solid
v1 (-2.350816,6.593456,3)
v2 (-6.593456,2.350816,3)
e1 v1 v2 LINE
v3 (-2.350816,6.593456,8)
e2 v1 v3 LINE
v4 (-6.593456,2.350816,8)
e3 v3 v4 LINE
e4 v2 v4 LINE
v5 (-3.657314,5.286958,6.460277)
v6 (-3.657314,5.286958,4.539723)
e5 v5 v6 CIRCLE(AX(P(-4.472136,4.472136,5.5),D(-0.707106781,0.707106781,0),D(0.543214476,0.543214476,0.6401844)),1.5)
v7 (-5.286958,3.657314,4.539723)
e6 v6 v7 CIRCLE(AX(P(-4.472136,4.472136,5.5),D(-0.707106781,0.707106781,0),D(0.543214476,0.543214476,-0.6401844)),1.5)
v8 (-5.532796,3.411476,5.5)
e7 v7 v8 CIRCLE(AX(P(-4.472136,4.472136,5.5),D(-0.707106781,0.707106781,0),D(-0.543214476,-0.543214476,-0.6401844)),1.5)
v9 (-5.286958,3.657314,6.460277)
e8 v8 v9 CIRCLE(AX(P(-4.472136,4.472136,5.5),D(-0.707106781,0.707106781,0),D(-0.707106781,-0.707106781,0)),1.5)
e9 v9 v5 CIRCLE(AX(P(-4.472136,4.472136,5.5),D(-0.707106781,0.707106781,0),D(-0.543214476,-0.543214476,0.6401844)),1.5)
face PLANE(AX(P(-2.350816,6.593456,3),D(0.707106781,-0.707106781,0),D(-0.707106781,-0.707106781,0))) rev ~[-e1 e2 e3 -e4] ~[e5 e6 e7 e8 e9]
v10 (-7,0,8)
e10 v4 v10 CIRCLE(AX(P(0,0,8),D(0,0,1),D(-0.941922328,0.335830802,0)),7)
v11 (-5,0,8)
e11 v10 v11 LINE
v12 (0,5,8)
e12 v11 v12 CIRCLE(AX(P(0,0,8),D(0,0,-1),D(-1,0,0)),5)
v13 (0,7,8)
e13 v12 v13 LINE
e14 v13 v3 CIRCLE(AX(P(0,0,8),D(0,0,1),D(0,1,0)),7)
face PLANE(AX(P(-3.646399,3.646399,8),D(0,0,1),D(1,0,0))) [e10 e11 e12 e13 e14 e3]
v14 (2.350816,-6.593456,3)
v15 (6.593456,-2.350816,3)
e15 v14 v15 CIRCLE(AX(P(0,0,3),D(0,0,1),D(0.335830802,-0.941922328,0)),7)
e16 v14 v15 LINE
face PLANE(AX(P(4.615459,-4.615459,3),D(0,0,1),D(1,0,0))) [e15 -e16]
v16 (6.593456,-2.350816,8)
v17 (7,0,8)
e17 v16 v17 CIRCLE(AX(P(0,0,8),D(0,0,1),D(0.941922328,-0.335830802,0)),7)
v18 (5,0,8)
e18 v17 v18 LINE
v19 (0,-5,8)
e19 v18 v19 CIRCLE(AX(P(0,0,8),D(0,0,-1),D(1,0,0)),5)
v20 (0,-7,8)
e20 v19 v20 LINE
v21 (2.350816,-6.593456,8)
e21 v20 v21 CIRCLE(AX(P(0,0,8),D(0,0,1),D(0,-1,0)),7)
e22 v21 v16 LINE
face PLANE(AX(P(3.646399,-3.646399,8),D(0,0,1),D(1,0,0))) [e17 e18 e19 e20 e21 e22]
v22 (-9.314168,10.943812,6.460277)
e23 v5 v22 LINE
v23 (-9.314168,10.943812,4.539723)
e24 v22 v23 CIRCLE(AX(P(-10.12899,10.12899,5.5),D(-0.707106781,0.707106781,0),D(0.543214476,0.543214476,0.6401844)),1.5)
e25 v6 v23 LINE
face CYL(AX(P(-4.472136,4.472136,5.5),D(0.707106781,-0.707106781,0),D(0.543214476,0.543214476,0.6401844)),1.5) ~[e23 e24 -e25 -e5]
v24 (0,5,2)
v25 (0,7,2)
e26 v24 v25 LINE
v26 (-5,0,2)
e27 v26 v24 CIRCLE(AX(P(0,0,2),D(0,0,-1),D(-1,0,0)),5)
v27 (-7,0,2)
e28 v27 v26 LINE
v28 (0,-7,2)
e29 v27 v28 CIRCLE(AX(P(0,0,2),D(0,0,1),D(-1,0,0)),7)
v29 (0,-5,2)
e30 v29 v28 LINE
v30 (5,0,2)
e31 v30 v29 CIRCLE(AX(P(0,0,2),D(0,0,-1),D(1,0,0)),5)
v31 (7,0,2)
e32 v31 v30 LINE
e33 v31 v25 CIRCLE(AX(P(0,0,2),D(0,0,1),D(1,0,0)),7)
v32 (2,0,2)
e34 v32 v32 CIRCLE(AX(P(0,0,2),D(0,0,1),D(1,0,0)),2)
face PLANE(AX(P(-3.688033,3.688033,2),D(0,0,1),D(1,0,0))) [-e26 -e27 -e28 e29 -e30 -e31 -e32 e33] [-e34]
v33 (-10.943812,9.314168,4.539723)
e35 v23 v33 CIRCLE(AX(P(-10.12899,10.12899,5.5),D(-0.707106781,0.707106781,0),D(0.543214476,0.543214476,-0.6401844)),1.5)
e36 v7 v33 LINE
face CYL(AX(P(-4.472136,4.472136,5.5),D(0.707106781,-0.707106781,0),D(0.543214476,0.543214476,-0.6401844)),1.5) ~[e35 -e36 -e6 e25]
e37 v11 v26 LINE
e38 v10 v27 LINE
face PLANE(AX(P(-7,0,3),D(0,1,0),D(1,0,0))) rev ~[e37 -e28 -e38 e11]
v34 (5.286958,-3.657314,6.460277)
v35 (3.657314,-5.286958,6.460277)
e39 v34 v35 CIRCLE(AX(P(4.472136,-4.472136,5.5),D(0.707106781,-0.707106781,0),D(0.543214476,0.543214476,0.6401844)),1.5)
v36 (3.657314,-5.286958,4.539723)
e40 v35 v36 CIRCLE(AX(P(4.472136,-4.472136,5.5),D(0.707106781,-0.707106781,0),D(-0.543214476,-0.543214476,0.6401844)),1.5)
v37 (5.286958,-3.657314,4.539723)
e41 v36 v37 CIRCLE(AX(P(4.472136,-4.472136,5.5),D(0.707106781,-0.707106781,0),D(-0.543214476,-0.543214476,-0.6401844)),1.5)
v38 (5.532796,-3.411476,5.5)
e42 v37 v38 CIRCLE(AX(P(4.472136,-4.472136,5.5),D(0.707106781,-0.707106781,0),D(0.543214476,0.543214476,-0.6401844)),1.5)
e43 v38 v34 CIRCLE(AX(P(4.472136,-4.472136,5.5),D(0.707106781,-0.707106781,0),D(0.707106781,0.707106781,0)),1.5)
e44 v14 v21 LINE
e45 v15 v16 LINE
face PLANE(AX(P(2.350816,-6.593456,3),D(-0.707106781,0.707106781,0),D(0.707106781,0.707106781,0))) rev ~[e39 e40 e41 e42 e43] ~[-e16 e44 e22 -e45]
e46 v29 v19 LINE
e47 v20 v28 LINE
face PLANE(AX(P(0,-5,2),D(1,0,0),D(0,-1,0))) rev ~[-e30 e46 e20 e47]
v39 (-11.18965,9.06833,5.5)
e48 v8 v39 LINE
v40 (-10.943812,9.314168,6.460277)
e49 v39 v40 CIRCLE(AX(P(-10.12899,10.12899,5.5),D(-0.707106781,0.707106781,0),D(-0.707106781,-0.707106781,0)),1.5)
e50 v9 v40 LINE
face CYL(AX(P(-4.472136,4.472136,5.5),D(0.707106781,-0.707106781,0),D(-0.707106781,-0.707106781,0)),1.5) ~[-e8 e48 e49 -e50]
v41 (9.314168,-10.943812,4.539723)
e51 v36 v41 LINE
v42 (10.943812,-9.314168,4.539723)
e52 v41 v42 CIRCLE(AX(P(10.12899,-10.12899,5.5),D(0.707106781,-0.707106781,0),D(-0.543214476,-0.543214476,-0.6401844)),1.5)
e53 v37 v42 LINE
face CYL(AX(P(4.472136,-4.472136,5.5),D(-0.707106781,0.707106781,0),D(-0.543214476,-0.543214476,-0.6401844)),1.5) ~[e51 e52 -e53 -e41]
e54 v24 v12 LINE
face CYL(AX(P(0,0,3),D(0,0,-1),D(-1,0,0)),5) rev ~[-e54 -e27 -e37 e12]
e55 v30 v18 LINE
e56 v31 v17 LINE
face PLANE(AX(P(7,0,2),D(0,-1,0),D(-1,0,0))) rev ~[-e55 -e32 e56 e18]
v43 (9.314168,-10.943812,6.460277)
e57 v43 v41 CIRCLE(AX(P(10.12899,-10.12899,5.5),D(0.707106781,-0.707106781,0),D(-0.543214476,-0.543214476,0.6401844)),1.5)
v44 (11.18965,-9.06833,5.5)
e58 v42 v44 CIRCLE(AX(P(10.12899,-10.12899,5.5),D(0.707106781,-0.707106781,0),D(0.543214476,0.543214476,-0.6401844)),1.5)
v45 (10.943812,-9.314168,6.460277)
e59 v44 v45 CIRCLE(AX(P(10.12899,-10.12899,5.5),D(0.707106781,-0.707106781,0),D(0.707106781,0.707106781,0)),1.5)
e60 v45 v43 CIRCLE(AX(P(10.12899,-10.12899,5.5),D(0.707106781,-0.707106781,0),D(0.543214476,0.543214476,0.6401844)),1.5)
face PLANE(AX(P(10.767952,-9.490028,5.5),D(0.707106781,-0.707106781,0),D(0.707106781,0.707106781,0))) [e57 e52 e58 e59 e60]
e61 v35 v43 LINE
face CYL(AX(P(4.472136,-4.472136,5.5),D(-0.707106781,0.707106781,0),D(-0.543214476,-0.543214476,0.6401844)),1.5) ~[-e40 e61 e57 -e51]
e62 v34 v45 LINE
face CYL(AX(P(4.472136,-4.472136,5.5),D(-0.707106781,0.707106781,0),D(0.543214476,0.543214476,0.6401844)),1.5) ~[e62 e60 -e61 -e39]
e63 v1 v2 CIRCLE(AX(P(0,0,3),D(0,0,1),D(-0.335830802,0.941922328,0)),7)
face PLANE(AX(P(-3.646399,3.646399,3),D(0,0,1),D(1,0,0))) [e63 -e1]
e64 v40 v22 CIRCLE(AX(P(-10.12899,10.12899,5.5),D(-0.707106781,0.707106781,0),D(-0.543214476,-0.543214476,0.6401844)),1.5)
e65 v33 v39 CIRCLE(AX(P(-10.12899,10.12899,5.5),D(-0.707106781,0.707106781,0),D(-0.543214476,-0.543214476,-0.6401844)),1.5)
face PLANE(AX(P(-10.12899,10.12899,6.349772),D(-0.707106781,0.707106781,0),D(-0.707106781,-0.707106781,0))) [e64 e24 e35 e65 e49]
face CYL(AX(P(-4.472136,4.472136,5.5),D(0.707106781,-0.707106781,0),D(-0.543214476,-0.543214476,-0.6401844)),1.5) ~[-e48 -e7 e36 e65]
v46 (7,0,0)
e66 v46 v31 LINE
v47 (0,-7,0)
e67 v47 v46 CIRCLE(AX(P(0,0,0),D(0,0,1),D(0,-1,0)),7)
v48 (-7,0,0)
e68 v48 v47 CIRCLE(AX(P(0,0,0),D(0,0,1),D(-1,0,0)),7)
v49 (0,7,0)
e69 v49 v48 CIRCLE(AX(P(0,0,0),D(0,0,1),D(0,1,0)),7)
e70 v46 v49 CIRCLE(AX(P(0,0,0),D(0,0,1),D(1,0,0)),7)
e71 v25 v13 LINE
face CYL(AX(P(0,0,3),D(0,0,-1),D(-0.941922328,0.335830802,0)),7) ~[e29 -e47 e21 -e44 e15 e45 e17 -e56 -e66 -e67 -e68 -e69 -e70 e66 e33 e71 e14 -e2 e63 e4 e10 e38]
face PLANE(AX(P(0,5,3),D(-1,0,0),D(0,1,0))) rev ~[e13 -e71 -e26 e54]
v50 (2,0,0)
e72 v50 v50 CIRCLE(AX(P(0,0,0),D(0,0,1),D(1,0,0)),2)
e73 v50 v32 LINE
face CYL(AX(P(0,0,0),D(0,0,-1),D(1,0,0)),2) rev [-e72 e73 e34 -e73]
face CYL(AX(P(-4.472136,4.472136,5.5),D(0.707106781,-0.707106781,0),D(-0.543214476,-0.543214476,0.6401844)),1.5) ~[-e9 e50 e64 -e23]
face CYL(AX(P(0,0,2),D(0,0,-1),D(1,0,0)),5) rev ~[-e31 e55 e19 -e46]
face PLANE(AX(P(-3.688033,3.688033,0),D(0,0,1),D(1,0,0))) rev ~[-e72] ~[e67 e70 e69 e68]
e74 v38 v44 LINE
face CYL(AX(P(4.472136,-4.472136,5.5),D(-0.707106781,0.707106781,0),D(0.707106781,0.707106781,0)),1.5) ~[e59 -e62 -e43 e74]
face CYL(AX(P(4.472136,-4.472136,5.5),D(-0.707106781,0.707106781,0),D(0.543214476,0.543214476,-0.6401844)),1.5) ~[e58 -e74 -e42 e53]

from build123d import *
from build123d import SkipClean  # not in build123d's __all__

# Parameters (mm, degrees)
F0_R     = 2
F1_DEPTH = 2
F3_DEPTH = 1
F5_DEPTH = 5
F8_DEPTH = 8
F9_DEPTH = 8


with BuildPart() as f1:
    # F0 (on Top) → F1 (new body)
    with BuildSketch(Plane.XY):
        with BuildLine():
            ThreePointArc((-5, 0), (-3.5355339059, 3.5355339059), (0, 5))
            Line((0, 5), (0, 7))
            ThreePointArc((0, 7), (-4.9497474683, 4.9497474683), (-7, 0))
            Line((-7, 0), (-5, 0))
        make_face()
        with BuildLine():
            ThreePointArc((0, 5), (3.5355339059, 3.5355339059), (5, 0))
            Line((5, 0), (7, 0))
            ThreePointArc((7, 0), (4.9497474683, 4.9497474683), (0, 7))
            Line((0, 7), (0, 5))
        make_face()
        with BuildLine():
            Line((7, 0), (5, 0))
            ThreePointArc((5, 0), (3.5355339059, -3.5355339059), (0, -5))
            Line((0, -5), (0, -7))
            ThreePointArc((0, -7), (4.9497474683, -4.9497474683), (7, 0))
        make_face()
        with BuildLine():
            Line((0, -7), (0, -5))
            ThreePointArc((0, -5), (-3.5355339059, -3.5355339059), (-5, 0))
            Line((-5, 0), (-7, 0))
            ThreePointArc((-7, 0), (-4.9497474683, -4.9497474683), (0, -7))
        make_face()
        with BuildLine():
            ThreePointArc((0, -5), (3.5355339059, -3.5355339059), (5, 0))
            ThreePointArc((5, 0), (3.5355339059, 3.5355339059), (0, 5))
            ThreePointArc((0, 5), (-3.5355339059, 3.5355339059), (-5, 0))
            ThreePointArc((-5, 0), (-3.5355339059, -3.5355339059), (0, -5))
        make_face()
        Circle(F0_R, mode=Mode.SUBTRACT)
    extrude(amount=F1_DEPTH)

    # F2 (on face) → F3 (join)
    with BuildSketch(Plane.XY.offset(2)):
        with BuildLine():
            ThreePointArc((-5, 0), (-3.5355339059, 3.5355339059), (0, 5))
            Line((0, 5), (0, 7))
            ThreePointArc((0, 7), (-1.1928549598, 6.8976153158), (-2.3508156114, 6.5934562986))
            Line((-2.3508156114, 6.5934562986), (-6.5934562986, 2.3508156114))
            ThreePointArc((-6.5934562986, 2.3508156114), (-6.8976153158, 1.1928549598), (-7, 0))
            Line((-7, 0), (-5, 0))
        make_face()
        with BuildLine():
            Line((-6.5934562986, 2.3508156114), (-2.3508156114, 6.5934562986))
            ThreePointArc((-2.3508156114, 6.5934562986), (-4.9497474683, 4.9497474683), (-6.5934562986, 2.3508156114))
        make_face()
        with BuildLine():
            ThreePointArc((2.3508156114, -6.5934562986), (4.9497474683, -4.9497474683), (6.5934562986, -2.3508156114))
            Line((6.5934562986, -2.3508156114), (2.3508156114, -6.5934562986))
        make_face()
        with BuildLine():
            Line((7, 0), (5, 0))
            ThreePointArc((5, 0), (3.5355339059, -3.5355339059), (0, -5))
            Line((0, -5), (0, -7))
            ThreePointArc((0, -7), (1.1928549598, -6.8976153158), (2.3508156114, -6.5934562986))
            Line((2.3508156114, -6.5934562986), (6.5934562986, -2.3508156114))
            ThreePointArc((6.5934562986, -2.3508156114), (6.8976153158, -1.1928549598), (7, 0))
        make_face()
    with SkipClean():  # cleaning this boolean's faces spoils the solid; the shape is the same uncleaned
        extrude(amount=F3_DEPTH)

    # F4 (on face) → F5 (join)
    with BuildSketch(Plane.XY.offset(3)):
        with BuildLine():
            ThreePointArc((-5, 0), (-3.5355339059, 3.5355339059), (0, 5))
            Line((0, 5), (0, 7))
            ThreePointArc((0, 7), (-1.1928549598, 6.8976153158), (-2.3508156114, 6.5934562986))
            Line((-2.3508156114, 6.5934562986), (-6.5934562986, 2.3508156114))
            ThreePointArc((-6.5934562986, 2.3508156114), (-6.8976153158, 1.1928549598), (-7, 0))
            Line((-7, 0), (-5, 0))
        make_face()
        with BuildLine():
            Line((7, 0), (5, 0))
            ThreePointArc((5, 0), (3.5355339059, -3.5355339059), (0, -5))
            Line((0, -5), (0, -7))
            ThreePointArc((0, -7), (1.1928549598, -6.8976153158), (2.3508156114, -6.5934562986))
            Line((2.3508156114, -6.5934562986), (6.5934562986, -2.3508156114))
            ThreePointArc((6.5934562986, -2.3508156114), (6.8976153158, -1.1928549598), (7, 0))
        make_face()
    extrude(amount=F5_DEPTH)

    # F7 (on face) → F8 (join)
    with BuildSketch(Plane(origin=(4.472135955, -4.472135955, 0), x_dir=(0.7071067812, 0.7071067812, 0), z_dir=(0.7071067812, -0.7071067812, 0))):
        with BuildLine():
            Line((1.1523319194, 6.4602765995), (0, 5.5))
            Line((0, 5.5), (1.1523319194, 4.5397234005))
            ThreePointArc((1.1523319194, 4.5397234005), (1.4104073665, 4.9893621044), (1.5, 5.5))
            ThreePointArc((1.5, 5.5), (1.4104073665, 6.0106378956), (1.1523319194, 6.4602765995))
        make_face()
        with BuildLine():
            Line((0, 5.5), (-1.1523319194, 6.4602765995))
            ThreePointArc((-1.1523319194, 6.4602765995), (-1.5, 5.5), (-1.1523319194, 4.5397234005))
            Line((-1.1523319194, 4.5397234005), (0, 5.5))
        make_face()
        with BuildLine():
            ThreePointArc((1.1523319194, 6.4602765995), (0, 7), (-1.1523319194, 6.4602765995))
            Line((-1.1523319194, 6.4602765995), (0, 5.5))
            Line((0, 5.5), (1.1523319194, 6.4602765995))
        make_face()
        with BuildLine():
            Line((1.1523319194, 4.5397234005), (0, 5.5))
            Line((0, 5.5), (-1.1523319194, 4.5397234005))
            ThreePointArc((-1.1523319194, 4.5397234005), (0, 4), (1.1523319194, 4.5397234005))
        make_face()
    extrude(amount=F8_DEPTH)

    # F6 (on face) → F9 (join)
    with BuildSketch(Plane(origin=(-4.472135955, 4.472135955, 0), x_dir=(-0.7071067812, -0.7071067812, 0), z_dir=(-0.7071067812, 0.7071067812, 0))):
        with BuildLine():
            ThreePointArc((1.1523319194, 6.4602765995), (0, 7), (-1.1523319194, 6.4602765995))
            Line((-1.1523319194, 6.4602765995), (0, 5.5))
            Line((0, 5.5), (1.1523319194, 6.4602765995))
        make_face()
        with BuildLine():
            Line((1.1523319194, 6.4602765995), (0, 5.5))
            Line((0, 5.5), (1.1523319194, 4.5397234005))
            ThreePointArc((1.1523319194, 4.5397234005), (1.4104073665, 4.9893621044), (1.5, 5.5))
            ThreePointArc((1.5, 5.5), (1.4104073665, 6.0106378956), (1.1523319194, 6.4602765995))
        make_face()
        with BuildLine():
            Line((1.1523319194, 4.5397234005), (0, 5.5))
            Line((0, 5.5), (-1.1523319194, 4.5397234005))
            ThreePointArc((-1.1523319194, 4.5397234005), (0, 4), (1.1523319194, 4.5397234005))
        make_face()
        with BuildLine():
            Line((0, 5.5), (-1.1523319194, 6.4602765995))
            ThreePointArc((-1.1523319194, 6.4602765995), (-1.5, 5.5), (-1.1523319194, 4.5397234005))
            Line((-1.1523319194, 4.5397234005), (0, 5.5))
        make_face()
    extrude(amount=F9_DEPTH)


solid = f1.part
